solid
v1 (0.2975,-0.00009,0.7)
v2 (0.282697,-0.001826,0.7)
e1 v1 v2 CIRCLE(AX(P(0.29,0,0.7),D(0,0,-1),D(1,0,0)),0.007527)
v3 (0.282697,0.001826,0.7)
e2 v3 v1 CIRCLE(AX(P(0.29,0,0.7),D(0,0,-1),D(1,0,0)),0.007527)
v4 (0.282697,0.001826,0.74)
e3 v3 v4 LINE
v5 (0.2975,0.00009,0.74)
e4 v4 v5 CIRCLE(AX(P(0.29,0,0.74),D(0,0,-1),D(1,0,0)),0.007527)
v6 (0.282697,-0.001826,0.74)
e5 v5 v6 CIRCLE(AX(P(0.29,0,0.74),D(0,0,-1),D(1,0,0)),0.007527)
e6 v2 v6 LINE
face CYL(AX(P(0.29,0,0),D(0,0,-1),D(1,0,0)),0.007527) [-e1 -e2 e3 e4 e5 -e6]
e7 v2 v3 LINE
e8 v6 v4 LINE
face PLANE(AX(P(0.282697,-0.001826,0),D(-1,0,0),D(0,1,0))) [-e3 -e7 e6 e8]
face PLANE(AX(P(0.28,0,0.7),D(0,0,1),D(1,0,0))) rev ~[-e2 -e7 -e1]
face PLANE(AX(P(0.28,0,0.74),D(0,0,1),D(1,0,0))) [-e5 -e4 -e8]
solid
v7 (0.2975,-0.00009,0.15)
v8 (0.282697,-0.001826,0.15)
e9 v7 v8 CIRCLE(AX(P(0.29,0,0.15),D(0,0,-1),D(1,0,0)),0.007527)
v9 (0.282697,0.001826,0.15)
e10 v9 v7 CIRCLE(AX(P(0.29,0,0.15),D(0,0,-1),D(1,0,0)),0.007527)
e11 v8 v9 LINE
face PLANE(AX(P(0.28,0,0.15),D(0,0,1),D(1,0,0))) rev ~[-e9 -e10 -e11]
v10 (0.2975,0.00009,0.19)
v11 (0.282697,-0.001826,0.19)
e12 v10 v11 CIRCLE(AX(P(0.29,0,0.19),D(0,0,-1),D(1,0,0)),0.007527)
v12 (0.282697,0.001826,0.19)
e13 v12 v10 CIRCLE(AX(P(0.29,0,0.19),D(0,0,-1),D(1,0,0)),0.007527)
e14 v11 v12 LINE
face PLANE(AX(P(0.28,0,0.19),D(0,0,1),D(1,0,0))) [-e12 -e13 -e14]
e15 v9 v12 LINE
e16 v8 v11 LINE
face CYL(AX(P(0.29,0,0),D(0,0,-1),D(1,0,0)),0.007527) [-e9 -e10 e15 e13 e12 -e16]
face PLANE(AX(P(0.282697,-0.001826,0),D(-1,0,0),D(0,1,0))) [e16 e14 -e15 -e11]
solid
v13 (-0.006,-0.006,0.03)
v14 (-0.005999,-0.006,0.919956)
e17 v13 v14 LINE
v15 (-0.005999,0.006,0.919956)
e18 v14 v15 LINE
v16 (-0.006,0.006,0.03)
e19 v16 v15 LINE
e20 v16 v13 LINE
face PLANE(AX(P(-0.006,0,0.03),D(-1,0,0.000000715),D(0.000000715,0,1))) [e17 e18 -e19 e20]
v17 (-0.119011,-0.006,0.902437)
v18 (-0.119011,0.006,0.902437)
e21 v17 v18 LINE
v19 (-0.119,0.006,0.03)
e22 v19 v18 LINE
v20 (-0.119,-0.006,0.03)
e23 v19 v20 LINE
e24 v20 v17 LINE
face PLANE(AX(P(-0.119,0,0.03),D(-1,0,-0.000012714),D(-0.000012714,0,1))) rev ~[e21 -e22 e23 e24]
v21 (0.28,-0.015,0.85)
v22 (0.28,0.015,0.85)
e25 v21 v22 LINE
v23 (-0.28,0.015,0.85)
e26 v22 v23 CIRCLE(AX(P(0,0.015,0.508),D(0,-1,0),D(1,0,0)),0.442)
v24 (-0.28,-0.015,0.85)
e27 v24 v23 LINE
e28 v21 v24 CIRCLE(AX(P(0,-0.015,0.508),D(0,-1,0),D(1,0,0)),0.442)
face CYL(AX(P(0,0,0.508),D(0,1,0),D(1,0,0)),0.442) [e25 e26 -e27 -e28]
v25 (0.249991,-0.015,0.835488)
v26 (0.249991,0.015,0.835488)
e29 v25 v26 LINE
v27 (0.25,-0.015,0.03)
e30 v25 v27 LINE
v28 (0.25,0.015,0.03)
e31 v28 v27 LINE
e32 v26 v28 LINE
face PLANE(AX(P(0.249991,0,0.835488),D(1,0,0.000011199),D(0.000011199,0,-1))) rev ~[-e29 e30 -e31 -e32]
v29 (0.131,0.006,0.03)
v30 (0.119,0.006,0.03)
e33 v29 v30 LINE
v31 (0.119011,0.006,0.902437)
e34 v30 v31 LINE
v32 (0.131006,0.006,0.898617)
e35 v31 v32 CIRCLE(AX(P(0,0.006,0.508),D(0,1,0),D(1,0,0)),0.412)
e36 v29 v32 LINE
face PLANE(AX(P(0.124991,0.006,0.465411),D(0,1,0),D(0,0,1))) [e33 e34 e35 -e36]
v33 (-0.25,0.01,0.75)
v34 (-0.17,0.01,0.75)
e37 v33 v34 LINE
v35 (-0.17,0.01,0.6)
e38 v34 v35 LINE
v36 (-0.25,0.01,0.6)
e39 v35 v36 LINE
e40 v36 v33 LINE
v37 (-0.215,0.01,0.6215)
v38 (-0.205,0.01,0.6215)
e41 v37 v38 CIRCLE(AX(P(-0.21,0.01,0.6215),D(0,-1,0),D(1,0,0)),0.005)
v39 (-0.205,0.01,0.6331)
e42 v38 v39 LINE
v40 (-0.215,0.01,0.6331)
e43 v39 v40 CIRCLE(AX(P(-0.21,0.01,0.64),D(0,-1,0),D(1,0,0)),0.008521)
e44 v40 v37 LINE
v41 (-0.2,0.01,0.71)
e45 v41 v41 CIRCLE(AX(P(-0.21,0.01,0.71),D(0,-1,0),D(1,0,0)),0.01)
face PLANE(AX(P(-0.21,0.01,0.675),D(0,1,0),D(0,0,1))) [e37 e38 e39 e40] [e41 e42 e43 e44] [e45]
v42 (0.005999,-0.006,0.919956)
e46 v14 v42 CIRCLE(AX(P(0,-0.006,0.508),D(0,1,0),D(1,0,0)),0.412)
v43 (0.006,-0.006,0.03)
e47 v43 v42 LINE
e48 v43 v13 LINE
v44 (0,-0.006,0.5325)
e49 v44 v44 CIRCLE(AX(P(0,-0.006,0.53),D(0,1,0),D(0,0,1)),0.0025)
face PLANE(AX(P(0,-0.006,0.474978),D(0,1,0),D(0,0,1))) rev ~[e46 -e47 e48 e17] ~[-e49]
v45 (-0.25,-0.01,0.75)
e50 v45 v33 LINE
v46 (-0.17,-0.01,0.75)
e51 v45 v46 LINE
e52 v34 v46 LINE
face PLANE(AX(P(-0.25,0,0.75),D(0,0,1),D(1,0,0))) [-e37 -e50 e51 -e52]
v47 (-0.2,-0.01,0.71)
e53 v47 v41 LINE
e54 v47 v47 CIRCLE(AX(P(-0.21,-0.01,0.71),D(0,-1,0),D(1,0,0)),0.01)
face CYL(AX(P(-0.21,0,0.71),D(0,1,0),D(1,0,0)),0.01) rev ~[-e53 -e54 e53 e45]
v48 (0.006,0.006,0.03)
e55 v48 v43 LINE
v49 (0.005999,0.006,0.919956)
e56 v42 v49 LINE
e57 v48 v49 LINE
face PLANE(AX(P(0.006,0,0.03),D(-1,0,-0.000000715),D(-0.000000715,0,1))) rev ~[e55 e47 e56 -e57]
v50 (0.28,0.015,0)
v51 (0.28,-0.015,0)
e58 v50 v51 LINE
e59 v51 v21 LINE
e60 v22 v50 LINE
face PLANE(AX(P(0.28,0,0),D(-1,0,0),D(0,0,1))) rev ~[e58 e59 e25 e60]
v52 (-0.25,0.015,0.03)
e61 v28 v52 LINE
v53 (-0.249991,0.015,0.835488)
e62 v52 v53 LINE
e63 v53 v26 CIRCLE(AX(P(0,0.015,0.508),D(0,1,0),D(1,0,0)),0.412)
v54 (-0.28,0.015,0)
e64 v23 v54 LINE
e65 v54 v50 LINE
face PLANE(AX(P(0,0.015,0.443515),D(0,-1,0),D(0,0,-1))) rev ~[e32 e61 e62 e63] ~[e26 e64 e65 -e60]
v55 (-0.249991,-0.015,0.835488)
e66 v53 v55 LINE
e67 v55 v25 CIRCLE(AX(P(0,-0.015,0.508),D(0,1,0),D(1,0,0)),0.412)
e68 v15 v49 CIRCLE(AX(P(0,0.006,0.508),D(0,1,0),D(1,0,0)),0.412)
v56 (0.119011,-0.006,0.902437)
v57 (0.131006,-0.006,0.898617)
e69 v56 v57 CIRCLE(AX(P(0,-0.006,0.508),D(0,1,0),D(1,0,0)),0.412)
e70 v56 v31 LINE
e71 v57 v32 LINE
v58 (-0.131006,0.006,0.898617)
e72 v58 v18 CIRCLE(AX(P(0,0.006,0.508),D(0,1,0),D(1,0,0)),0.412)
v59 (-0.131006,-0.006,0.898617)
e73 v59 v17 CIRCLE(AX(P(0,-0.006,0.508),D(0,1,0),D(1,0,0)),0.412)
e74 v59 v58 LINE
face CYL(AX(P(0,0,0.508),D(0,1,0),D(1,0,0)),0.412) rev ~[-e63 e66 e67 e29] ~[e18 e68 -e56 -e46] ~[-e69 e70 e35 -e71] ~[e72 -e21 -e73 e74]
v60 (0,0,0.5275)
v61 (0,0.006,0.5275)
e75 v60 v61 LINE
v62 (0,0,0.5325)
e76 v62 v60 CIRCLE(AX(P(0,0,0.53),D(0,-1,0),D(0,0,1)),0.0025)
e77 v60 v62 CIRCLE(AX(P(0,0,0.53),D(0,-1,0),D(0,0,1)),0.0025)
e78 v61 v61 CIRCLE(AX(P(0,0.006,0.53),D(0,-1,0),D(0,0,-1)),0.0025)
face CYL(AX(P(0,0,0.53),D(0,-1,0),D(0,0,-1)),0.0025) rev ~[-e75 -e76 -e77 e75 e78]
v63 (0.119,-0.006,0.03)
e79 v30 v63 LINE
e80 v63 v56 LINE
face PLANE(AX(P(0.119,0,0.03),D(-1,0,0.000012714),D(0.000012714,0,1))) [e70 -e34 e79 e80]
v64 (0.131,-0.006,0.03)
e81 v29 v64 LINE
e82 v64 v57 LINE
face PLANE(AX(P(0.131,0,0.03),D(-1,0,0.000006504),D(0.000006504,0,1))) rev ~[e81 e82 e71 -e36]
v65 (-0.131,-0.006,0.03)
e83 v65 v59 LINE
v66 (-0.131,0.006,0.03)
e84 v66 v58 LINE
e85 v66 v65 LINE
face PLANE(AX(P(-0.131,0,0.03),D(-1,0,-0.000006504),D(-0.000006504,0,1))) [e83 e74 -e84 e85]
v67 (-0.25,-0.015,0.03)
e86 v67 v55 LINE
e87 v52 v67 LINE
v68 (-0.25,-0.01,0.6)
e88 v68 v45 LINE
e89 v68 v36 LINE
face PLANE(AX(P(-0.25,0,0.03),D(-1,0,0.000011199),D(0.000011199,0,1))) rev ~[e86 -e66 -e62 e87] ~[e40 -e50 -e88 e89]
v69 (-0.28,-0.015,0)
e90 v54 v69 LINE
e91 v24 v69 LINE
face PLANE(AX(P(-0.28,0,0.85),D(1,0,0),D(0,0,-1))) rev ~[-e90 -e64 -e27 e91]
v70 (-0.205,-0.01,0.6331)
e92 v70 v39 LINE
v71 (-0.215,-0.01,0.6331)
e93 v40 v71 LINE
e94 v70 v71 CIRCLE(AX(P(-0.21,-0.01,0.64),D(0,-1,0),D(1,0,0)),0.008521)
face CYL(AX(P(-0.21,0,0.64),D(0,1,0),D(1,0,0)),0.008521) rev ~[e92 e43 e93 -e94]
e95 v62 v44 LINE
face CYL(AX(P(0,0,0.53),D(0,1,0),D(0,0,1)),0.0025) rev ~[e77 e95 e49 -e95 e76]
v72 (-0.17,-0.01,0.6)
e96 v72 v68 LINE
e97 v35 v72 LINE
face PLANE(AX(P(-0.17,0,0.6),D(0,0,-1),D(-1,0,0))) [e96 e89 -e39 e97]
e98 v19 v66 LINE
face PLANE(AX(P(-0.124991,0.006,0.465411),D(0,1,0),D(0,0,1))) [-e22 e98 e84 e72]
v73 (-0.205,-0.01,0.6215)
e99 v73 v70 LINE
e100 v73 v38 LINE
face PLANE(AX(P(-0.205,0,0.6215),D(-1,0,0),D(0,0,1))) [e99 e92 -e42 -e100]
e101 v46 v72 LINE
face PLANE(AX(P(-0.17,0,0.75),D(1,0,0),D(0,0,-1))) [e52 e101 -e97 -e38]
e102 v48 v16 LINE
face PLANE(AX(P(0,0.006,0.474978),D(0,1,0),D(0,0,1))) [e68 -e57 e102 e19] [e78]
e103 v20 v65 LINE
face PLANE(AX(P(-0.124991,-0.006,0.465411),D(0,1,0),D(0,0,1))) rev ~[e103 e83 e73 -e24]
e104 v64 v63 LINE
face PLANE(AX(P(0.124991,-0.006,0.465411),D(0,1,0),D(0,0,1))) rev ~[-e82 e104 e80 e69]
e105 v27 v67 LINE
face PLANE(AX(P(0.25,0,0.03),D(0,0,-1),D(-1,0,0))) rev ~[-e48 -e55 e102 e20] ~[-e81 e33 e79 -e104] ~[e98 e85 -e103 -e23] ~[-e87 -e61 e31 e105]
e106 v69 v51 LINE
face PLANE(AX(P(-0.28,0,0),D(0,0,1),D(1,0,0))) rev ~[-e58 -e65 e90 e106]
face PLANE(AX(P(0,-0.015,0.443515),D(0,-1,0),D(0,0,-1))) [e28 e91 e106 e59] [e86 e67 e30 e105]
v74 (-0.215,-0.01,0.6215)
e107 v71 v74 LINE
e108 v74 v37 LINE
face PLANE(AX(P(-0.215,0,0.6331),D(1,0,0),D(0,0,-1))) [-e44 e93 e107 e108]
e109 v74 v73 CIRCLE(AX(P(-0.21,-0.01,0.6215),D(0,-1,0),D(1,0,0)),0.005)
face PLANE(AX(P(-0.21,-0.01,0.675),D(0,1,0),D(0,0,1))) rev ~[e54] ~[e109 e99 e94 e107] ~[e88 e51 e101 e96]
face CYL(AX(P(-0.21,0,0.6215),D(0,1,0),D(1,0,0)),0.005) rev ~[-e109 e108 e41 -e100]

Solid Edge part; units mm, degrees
sketch "Sketch1" plane through (0, 0, 0) normal (0, -1, 0) x (1, 0, 0)
  line L0 (-0.28, 0.85) -> (-0.28, 0)
  line L1 (-0.28, 0) -> (0.28, 0)
  line L2 (0.28, 0) -> (0.28, 0.85)
  arc A0 (0.28, 0.85) -> (-0.28, 0.85) centre (0, 0.508) ccw
  line L3 (0.25, 0.8355) -> (0.25, 0.03)
  arc A1 (-0.25, 0.8355) -> (0.25, 0.8355) centre (0, 0.508) cw
  line L4 (-0.25, 0.03) -> (-0.25, 0.8355)
  line L5 (0.25, 0.03) -> (-0.25, 0.03)
  dimension "D1" = 0.28
  dimension "D2" = 0.28
extrude "Protrusion1" add sketch "Sketch1" along normal mid plane 0.03
sketch "Sketch2" plane through (0, 0, 0) normal (0, -1, 0) x (1, 0, 0)
  line L0 (-0.006, 0.03) -> (-0.006, 0.92)
  arc A0 (-0.006, 0.92) -> (0.006, 0.92) centre (0, 0.508) cw
  line L1 (0.006, 0.03) -> (0.006, 0.92)
  line L2 (0.006, 0.03) -> (-0.006, 0.03)
  line L3 (0.119, 0.03) -> (0.119, 0.9024)
  arc A1 (0.119, 0.9024) -> (0.131, 0.8986) centre (0, 0.508) cw
  line L4 (0.131, 0.03) -> (0.131, 0.8986)
  line L5 (0.131, 0.03) -> (0.119, 0.03)
  line L6 (-0.131, 0.03) -> (-0.131, 0.8986)
  arc A2 (-0.131, 0.8986) -> (-0.119, 0.9024) centre (0, 0.508) cw
  line L7 (-0.119, 0.03) -> (-0.119, 0.9024)
  line L8 (-0.119, 0.03) -> (-0.131, 0.03)
  dimension "D1" = 0.125
  dimension "D2" = 0.012
extrude "Stangen" add sketch "Sketch2" along normal mid plane 0.012
hole "Bohrung_1" at (0, 0, 0.53) direction (0, -1, 0) diameter 0.005 end through all both ways yes
sketch "Sketch3" plane through (0, 0, 0) normal (0, 0, -1) x (1, 0, 0)
  line L0 (0.28, 0.0025) -> (0.28, -0.0025)
  line L1 (0.2829, -0.0025) -> (0.28, -0.0025) construction
  line L2 (0.2829, 0.0025) -> (0.28, 0.0025) construction
  arc A0 (0.2829, 0.0025) -> (0.2829, -0.0025) centre (0.29, 0) cw
  dimension "D1" = 0.28
extrude "Protrusion2" add sketch "Sketch3" against normal blind 0.8
sketch "Sketch4" plane through (0, 0, 0) normal (0, -1, 0) x (1, 0, 0)
  line L0 (0.28, 0.15) -> (0.2975, 0.15)
  line L1 (0.2975, 0) -> (0.2975, 0.15)
  line L2 (0.2975, 0) -> (0.28, 0)
  line L3 (0.28, 0.15) -> (0.28, 0)
  line L4 (0.28, 0.74) -> (0.2975, 0.74)
  line L5 (0.2975, 0.74) -> (0.2975, 0.8)
  line L6 (0.28, 0.8) -> (0.2975, 0.8)
  line L7 (0.28, 0.8) -> (0.28, 0.74)
  line L8 (0.28, 0.7) -> (0.28, 0.19)
  line L9 (0.28, 0.19) -> (0.2975, 0.19)
  line L10 (0.2975, 0.19) -> (0.2975, 0.7)
  line L11 (0.28, 0.7) -> (0.2975, 0.7)
  dimension "D1" = 0.04
  dimension "D2" = 0.15
  dimension "D3" = 0.55
extrude "Cutout1" cut sketch "Sketch4" along normal through all and the other way through all
sketch "Sketch5" plane through (0, 0, 0) normal (0, -1, 0) x (1, 0, 0)
  line L0 (-0.17, 0.6) -> (-0.25, 0.6)
  line L1 (-0.25, 0.6) -> (-0.25, 0.75)
  line L2 (-0.25, 0.75) -> (-0.17, 0.75)
  line L3 (-0.17, 0.75) -> (-0.17, 0.6)
  line L4 (-0.215, 0.6331) -> (-0.215, 0.6215)
  arc A0 (-0.215, 0.6215) -> (-0.205, 0.6215) centre (-0.21, 0.6215) ccw
  line L5 (-0.205, 0.6215) -> (-0.205, 0.6331)
  arc A1 (-0.205, 0.6331) -> (-0.215, 0.6331) centre (-0.21, 0.64) ccw
  circle A2 centre (-0.21, 0.71) radius 0.01
  dimension "D1" = 0.25
  dimension "D2" = 0.17
  dimension "D3" = 0.21
extrude "Protrusion3" add sketch "Sketch5" along normal mid plane 0.02
